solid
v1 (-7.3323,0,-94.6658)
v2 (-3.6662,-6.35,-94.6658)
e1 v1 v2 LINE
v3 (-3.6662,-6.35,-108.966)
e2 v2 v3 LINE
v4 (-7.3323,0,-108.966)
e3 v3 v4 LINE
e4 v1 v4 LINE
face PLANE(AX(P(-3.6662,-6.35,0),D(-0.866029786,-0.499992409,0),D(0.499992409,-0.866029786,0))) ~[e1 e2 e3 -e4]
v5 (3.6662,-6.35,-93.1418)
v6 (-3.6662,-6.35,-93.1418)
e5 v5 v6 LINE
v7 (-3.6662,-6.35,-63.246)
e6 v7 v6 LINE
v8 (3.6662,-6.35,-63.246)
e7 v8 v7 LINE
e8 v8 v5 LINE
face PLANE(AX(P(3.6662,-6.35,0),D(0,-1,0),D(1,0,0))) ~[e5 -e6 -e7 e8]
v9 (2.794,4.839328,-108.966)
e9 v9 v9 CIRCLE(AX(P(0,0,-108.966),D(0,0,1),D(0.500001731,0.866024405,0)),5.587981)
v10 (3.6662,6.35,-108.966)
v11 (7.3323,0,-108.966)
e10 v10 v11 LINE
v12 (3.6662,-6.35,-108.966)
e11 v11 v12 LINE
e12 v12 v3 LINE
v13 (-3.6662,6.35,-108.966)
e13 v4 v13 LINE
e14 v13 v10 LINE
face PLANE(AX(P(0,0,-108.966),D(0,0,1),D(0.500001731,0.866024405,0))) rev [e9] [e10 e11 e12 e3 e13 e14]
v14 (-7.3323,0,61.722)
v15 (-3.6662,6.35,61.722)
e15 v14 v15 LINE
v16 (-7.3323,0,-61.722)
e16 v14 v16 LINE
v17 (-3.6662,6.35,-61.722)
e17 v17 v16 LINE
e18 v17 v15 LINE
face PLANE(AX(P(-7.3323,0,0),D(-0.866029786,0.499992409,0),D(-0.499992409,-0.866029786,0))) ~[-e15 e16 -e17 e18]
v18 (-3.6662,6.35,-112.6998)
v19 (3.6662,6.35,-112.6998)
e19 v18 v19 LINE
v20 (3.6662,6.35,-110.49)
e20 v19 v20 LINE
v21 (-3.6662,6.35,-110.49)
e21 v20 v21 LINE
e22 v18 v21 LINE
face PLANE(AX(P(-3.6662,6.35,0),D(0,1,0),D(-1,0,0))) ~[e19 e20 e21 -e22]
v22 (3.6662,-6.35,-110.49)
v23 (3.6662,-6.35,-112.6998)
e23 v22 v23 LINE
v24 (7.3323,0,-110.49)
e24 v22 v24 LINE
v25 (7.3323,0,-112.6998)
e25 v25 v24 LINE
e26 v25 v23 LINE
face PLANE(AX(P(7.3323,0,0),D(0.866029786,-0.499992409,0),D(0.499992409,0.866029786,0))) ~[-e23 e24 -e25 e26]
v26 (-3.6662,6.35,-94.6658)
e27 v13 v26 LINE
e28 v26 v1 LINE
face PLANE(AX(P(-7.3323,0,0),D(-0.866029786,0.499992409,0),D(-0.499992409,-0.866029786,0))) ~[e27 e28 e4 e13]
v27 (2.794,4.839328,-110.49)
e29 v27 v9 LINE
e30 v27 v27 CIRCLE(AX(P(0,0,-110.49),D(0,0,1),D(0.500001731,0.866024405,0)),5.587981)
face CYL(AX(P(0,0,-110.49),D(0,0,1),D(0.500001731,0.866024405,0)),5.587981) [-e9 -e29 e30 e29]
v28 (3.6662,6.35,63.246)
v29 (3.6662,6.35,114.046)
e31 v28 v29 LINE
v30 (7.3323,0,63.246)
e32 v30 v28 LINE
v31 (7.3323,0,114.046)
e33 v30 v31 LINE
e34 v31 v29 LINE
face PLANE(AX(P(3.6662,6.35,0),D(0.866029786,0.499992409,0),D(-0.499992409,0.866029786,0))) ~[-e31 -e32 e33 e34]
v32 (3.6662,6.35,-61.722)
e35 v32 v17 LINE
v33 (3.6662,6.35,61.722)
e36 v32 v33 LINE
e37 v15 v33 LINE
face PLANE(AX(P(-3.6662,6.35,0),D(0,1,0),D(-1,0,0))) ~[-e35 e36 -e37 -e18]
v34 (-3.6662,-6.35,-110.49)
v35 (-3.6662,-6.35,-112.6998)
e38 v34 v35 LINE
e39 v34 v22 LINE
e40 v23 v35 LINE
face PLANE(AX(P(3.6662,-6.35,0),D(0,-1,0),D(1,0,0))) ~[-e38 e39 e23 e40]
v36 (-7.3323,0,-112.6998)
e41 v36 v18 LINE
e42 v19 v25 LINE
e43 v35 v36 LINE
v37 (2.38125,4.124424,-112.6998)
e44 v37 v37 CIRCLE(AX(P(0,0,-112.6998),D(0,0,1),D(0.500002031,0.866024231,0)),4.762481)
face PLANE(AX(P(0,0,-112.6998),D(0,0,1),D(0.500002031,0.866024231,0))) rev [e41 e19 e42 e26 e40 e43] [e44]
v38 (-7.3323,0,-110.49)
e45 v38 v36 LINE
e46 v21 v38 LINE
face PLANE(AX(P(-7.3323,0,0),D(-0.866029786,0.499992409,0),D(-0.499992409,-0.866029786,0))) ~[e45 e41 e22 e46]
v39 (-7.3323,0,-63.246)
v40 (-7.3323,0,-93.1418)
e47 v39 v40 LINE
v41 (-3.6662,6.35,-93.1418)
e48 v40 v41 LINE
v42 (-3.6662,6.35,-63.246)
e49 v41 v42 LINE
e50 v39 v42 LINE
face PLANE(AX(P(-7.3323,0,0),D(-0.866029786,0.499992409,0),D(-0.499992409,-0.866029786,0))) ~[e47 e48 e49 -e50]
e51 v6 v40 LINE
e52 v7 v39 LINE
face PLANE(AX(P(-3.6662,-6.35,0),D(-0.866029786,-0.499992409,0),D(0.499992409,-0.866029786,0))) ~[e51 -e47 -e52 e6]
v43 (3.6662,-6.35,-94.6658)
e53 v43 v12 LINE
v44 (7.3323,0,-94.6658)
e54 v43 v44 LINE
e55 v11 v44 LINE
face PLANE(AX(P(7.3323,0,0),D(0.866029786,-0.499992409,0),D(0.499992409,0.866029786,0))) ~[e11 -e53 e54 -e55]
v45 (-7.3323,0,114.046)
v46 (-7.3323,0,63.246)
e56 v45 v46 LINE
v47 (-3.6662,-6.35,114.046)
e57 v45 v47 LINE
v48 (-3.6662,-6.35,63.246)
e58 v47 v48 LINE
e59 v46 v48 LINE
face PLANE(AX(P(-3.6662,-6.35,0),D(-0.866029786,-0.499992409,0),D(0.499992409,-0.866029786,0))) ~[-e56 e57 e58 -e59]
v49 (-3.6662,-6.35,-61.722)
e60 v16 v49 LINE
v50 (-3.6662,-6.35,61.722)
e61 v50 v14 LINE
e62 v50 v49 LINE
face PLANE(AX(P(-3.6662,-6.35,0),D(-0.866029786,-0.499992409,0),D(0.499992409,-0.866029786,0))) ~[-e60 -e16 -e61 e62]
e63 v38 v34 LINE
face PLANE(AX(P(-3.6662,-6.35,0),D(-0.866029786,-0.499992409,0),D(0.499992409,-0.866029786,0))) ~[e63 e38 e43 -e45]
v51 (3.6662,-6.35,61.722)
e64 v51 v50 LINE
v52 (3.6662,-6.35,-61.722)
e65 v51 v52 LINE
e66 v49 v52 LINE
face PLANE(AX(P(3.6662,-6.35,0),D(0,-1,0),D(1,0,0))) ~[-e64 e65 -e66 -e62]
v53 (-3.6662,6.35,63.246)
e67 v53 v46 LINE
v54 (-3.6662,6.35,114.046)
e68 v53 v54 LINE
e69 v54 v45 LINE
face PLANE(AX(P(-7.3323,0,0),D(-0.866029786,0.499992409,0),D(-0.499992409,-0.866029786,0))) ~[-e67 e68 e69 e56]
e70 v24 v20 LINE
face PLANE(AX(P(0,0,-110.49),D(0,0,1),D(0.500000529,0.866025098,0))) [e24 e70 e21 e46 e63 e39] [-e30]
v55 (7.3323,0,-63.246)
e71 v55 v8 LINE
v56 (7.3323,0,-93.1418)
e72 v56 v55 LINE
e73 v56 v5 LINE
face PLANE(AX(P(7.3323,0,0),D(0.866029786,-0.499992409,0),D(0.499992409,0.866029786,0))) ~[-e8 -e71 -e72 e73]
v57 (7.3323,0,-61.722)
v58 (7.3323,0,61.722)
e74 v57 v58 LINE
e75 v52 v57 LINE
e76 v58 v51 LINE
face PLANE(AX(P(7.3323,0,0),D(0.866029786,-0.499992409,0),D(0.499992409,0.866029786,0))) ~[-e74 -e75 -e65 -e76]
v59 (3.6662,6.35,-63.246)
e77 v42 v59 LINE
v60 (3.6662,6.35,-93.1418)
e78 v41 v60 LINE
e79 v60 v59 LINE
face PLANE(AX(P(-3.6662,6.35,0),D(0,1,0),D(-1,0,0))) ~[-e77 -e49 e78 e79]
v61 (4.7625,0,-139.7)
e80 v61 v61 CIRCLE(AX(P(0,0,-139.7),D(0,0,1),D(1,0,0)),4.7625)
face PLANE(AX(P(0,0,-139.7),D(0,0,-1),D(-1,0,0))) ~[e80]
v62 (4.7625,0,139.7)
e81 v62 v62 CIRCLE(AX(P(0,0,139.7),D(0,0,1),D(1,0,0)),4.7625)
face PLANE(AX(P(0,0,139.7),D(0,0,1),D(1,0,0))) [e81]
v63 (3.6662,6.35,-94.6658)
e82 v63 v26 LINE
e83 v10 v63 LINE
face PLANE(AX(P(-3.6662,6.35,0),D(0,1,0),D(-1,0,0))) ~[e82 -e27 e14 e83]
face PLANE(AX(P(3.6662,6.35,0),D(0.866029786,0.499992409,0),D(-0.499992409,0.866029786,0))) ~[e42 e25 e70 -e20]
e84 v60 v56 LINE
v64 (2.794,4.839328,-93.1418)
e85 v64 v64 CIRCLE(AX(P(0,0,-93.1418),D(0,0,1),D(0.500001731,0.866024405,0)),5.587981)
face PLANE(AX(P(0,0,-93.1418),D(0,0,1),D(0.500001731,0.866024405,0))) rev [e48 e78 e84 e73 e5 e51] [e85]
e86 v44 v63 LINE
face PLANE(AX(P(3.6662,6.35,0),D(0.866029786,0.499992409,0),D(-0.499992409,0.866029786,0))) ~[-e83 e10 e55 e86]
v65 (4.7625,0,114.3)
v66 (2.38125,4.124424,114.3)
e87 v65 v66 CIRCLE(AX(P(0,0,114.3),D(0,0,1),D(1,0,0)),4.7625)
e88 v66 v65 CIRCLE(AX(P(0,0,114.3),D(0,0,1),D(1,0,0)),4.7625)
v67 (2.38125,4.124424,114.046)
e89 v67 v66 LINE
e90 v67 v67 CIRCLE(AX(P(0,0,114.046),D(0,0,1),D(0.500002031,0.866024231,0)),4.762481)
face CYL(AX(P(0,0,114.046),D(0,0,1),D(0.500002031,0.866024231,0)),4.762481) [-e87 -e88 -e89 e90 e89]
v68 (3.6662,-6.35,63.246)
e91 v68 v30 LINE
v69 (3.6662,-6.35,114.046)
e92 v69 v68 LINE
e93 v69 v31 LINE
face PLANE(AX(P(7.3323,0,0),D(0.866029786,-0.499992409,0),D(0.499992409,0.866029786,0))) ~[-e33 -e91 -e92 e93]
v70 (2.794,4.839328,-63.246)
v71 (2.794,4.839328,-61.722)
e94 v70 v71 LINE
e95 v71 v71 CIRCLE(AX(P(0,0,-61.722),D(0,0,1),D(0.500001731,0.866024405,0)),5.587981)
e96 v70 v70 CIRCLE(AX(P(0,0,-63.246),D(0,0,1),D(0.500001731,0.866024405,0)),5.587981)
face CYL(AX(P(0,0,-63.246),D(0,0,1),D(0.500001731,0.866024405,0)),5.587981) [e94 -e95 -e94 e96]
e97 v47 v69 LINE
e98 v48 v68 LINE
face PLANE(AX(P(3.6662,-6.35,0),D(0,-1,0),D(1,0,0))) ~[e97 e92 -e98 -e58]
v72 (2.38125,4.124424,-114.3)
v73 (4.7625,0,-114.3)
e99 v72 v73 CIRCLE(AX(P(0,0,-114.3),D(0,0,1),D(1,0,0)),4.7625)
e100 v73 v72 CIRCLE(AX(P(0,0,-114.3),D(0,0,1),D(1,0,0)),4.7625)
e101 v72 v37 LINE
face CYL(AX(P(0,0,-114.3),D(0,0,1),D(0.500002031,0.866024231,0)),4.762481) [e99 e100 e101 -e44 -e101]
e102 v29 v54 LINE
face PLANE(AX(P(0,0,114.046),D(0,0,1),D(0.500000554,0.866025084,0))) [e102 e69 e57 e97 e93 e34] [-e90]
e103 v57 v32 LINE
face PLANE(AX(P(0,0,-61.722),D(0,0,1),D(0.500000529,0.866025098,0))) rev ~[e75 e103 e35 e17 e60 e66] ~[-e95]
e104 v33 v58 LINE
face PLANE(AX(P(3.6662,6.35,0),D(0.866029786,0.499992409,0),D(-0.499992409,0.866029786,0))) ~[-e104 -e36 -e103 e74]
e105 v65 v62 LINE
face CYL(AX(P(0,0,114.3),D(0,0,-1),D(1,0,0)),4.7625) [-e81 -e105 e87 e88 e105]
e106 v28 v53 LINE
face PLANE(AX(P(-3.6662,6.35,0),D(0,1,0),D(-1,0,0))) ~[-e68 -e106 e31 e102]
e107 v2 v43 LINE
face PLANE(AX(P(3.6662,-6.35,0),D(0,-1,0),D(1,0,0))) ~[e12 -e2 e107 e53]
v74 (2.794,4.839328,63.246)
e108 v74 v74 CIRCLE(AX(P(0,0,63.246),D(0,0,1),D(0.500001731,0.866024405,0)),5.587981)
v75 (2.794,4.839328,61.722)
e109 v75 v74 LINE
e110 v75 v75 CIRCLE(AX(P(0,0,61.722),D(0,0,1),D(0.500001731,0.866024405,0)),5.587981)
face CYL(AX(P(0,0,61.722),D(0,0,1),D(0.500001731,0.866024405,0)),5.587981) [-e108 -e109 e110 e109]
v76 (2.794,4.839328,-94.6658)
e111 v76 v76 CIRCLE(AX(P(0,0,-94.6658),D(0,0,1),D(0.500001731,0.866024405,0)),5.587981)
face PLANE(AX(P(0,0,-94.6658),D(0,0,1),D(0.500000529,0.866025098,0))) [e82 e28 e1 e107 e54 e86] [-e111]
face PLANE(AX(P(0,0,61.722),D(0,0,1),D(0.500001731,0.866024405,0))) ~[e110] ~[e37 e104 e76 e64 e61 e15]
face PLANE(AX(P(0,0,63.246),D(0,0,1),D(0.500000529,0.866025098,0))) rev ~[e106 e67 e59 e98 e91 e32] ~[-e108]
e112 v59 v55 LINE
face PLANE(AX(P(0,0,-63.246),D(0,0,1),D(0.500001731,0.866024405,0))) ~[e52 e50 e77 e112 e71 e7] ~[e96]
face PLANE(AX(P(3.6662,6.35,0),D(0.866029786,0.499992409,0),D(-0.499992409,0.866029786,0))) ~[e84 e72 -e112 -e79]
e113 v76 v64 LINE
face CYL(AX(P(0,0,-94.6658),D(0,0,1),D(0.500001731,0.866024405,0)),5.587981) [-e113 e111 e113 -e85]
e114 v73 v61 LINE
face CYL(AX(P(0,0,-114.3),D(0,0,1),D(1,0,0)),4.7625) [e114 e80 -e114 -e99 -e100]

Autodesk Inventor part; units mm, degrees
ref_plane "YZ Plane" through (0, 0, 0) normal (1, 0, 0) x (0, 1, 0)
sketch "Sketch1" plane through (0, 0, 0) normal (0, 0, 1) x (1, 0, 0)
  line L0 (7.3323, 0) -> (3.6662, -6.35)
  line L1 (3.6662, -6.35) -> (-3.6662, -6.35)
  line L2 (-3.6662, -6.35) -> (-7.3323, 0)
  line L3 (-7.3323, 0) -> (-3.6662, 6.35)
  line L4 (-3.6662, 6.35) -> (3.6662, 6.35)
  line L5 (3.6662, 6.35) -> (7.3323, 0)
  point P0 (0, 0)
  point P1 (0, 0)
  dimension "d0" = 12.7
extrude "Extrusion1" add sketch "Sketch1" along normal blind 114.3
sketch "Sketch2" plane through (0, 0, 114.3) normal (0, 0, 1) x (1, 0, 0)
  circle A0 centre (0, 0) radius 4.7625
  dimension "d3" = 9.525
extrude "Extrusion2" add sketch "Sketch2" along normal blind 25.4
mirror "Mirror1" about plane through (0, 0, 0) normal (0, 0, -1) of "Extrusion2", "Extrusion1"
ref_plane "Work Plane1" through (1.8331, 3.175, -114.3) normal (-0.8660254, 0.5, 0) x (0, 0, 1)
sketch "Sketch3" plane through (1.8331, 3.175, -114.3) normal (-0.8660254, 0.5, 0) x (0, 0, 1)
  line L0 (-25.4, 1.0963) -> (-25.4, -8.4287) construction
  line L1 (0, 1.0963) -> (0, -8.4287) construction
  line L2 (-25.4, 1.0963) -> (0, 1.0963) construction
  line L3 (-25.4, -8.4287) -> (0, -8.4287) construction
  line L4 (228.6, 3.6662) -> (0, 3.6662) construction
  line L5 (228.6, -7.3323) -> (228.6, 0) construction
  line L6 (228.6, 0) -> (0, 0) construction
  line L7 (0, -7.3323) -> (0, 0) construction
  line L8 (228.6, -7.3323) -> (0, -7.3323) construction
  line L9 (228.6, 0) -> (228.6, 3.6662) construction
  line L10 (228.6, 3.6662) -> (0, 3.6662) construction
  line L11 (0, 0) -> (0, 3.6662) construction
  line L12 (228.6, 0) -> (0, 0) construction
  line L13 (228.6, -10.9985) -> (228.6, -7.3323) construction
  line L14 (228.6, -7.3323) -> (0, -7.3323) construction
  line L15 (0, -10.9985) -> (0, -7.3323) construction
  line L16 (228.6, -10.9985) -> (0, -10.9985) construction
  line L17 (254, 1.0963) -> (254, -8.4287) construction
  line L18 (228.6, 1.0963) -> (228.6, -8.4287) construction
  line L19 (228.6, 1.0963) -> (254, 1.0963) construction
  line L20 (228.6, -8.4287) -> (254, -8.4287) construction
  line L21 (-25.4, -3.6662) -> (254, -3.6662) construction
  line L22 (3.81, 14.6218) -> (3.81, 1.9218)
  line L23 (3.81, 1.9218) -> (5.334, 1.9218)
  line L24 (5.334, 1.9218) -> (5.334, 14.6218)
  line L25 (5.334, 14.6218) -> (3.81, 14.6218)
  line L26 (19.6342, 14.6218) -> (19.6342, 1.9218)
  line L27 (19.6342, 1.9218) -> (21.1582, 1.9218)
  line L28 (21.1582, 1.9218) -> (21.1582, 14.6218)
  line L29 (21.1582, 14.6218) -> (19.6342, 14.6218)
  line L30 (0, 1.9218) -> (228.6, 1.9218) construction
  line L31 (51.054, 1.9218) -> (51.054, 14.6218)
  line L32 (51.054, 14.6218) -> (52.578, 14.6218)
  line L33 (52.578, 14.6218) -> (52.578, 1.9218)
  line L34 (51.054, 1.9218) -> (52.578, 1.9218)
  line L35 (176.022, 1.9218) -> (176.022, 14.6218)
  line L36 (176.022, 14.6218) -> (177.546, 14.6218)
  line L37 (177.546, 14.6218) -> (177.546, 1.9218)
  line L38 (176.022, 1.9218) -> (177.546, 1.9218)
  line L39 (0, 13.7963) -> (0, 1.0963)
  line L40 (0, 1.0963) -> (1.6002, 1.0963)
  line L41 (1.6002, 1.0963) -> (1.6002, 13.7963)
  line L42 (1.6002, 13.7963) -> (0, 13.7963)
  line L43 (228.346, 13.7963) -> (228.346, 1.0963)
  line L44 (228.346, 1.0963) -> (228.6, 1.0963)
  line L45 (228.6, 1.0963) -> (228.6, 13.7963)
  line L46 (228.6, 13.7963) -> (228.346, 13.7963)
  point P0 (114.3, -3.6662)
  dimension "d6" = 12.7
  dimension "d7" = 1.524
  dimension "d10" = 1.524
  dimension "d11" = 5.588
  dimension "d13" = 1.524
  dimension "d14" = 1.524
  dimension "d16" = 14.3002
  dimension "d18" = 123.444
  dimension "d19" = 61.722
  dimension "d23" = 1.6002
  dimension "d24" = 12.7
  dimension "d25" = 12.7
  dimension "d26" = 0.254
  dimension "d27" = 3.81
revolve "Revolution1" cut sketch "Sketch3" angle 360 about axis through (0, 0, -139.7) along (0, 0, 1)
ref_plane "Work Plane2" through (-3.6662, -6.35, 0) normal (0, 0, 1) x (1, 0, 0)
equation "\"d10\" = d7"
equation "\"d13\" = d7"
equation "\"d14\" = d7"
equation "\"d19\" = 0.5 * d18"
equation "\"d25\" = d6"
properties part number "0.5 in Hex Shaft V3" material "Steel"
